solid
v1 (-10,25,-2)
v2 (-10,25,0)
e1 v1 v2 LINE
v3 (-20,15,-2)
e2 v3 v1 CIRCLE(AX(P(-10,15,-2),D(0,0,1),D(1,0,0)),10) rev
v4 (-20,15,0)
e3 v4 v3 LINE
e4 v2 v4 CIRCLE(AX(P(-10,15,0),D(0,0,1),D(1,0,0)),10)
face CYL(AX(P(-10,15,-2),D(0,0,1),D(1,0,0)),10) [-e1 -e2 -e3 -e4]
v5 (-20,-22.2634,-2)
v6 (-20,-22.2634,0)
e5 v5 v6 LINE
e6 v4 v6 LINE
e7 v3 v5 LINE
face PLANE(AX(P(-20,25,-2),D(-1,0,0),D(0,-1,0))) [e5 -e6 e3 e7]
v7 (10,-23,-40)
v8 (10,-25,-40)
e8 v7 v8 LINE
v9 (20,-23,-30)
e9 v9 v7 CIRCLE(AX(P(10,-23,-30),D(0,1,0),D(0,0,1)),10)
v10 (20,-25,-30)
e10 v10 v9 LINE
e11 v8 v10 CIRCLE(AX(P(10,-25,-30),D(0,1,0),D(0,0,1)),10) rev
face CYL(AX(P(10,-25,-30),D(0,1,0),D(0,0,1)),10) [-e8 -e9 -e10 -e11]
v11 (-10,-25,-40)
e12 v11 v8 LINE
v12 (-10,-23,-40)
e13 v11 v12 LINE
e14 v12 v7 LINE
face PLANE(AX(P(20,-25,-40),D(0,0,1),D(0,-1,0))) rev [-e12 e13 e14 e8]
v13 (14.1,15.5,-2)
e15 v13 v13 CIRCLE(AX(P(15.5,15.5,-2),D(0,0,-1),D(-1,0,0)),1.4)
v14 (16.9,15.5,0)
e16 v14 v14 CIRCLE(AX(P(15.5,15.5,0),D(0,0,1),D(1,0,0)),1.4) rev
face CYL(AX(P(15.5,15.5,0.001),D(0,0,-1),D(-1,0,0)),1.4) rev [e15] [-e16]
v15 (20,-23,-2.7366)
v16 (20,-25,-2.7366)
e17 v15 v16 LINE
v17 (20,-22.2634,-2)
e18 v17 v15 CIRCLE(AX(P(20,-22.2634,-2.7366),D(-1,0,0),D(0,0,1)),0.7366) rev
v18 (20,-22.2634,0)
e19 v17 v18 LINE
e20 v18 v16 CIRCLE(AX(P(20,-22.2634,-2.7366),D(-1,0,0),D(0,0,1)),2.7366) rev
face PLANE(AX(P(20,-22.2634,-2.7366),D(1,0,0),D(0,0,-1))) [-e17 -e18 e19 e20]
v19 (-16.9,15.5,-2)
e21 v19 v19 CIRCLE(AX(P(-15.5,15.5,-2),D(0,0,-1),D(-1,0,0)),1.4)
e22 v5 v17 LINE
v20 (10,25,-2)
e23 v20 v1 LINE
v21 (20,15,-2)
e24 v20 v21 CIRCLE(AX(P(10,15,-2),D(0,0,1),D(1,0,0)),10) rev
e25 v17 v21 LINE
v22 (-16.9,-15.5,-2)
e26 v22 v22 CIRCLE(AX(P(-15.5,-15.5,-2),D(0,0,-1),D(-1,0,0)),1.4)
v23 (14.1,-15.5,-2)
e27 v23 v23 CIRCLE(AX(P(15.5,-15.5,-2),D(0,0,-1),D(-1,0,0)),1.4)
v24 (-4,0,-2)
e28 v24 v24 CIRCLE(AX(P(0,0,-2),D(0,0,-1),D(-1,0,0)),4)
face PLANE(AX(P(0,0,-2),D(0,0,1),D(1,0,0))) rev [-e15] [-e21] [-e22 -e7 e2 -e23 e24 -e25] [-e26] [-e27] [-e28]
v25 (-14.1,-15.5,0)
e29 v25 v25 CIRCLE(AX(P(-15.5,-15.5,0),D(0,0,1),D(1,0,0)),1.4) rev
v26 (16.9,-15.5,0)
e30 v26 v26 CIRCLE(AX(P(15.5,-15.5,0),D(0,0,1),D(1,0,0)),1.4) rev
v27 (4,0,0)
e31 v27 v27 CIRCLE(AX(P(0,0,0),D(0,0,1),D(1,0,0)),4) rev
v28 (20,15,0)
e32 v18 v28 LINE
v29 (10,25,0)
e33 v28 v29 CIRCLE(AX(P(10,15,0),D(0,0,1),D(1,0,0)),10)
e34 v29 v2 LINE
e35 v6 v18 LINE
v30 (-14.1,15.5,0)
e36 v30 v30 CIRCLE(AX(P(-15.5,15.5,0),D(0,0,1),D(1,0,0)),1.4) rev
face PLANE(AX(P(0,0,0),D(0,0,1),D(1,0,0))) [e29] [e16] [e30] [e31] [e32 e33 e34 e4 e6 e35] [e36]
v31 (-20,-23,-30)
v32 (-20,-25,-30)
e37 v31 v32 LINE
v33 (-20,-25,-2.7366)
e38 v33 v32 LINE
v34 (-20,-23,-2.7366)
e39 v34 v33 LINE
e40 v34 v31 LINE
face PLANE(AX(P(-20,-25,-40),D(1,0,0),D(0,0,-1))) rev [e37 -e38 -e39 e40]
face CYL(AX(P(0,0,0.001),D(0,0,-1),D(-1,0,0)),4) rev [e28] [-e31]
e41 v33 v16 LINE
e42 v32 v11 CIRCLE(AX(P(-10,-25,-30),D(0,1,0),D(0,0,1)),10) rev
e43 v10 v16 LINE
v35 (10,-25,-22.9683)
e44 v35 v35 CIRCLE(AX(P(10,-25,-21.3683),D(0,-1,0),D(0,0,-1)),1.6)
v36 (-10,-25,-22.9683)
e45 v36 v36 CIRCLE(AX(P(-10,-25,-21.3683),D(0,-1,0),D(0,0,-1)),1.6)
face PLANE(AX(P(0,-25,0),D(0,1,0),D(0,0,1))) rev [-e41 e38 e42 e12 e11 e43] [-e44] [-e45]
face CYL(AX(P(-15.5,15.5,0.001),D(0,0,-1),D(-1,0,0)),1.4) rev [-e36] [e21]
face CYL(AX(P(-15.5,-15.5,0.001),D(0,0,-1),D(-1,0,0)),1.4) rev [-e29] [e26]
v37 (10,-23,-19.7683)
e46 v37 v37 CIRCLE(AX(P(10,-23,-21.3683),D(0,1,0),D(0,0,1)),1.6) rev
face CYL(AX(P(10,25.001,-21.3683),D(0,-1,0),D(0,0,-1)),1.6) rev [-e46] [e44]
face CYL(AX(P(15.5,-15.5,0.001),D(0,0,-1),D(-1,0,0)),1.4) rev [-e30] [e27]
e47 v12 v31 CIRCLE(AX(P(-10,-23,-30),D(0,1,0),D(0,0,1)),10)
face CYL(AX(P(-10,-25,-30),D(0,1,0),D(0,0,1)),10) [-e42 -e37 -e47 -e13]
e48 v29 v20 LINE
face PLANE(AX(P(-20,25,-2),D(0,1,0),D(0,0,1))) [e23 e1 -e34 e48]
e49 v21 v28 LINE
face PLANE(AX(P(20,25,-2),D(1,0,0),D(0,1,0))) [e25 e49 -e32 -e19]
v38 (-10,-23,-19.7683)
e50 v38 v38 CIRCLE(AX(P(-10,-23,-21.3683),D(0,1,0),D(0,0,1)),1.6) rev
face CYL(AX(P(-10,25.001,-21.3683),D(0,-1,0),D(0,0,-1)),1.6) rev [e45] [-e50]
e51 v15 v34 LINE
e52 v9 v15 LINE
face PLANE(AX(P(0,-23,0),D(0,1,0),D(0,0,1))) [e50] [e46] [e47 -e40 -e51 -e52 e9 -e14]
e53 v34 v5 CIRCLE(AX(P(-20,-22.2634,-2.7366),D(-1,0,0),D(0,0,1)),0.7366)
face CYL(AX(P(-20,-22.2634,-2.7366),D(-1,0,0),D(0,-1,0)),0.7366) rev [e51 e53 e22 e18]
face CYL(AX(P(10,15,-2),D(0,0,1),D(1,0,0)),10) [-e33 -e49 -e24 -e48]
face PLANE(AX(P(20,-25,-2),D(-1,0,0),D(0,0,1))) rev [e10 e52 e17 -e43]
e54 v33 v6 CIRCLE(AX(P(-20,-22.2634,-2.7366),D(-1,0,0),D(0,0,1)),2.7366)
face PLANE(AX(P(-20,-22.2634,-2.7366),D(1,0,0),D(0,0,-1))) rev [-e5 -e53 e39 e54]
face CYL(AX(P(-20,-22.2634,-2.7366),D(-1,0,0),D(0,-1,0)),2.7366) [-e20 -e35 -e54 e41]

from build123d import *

# Parameters (mm, degrees)
SKETCH1_W                    = 40
SKETCH1_H                    = 50
BASE_FLANGE1_DEPTH           = 2
EDGE_FLANGE1_STRIP_W         = 9.4732
EDGE_FLANGE1_STRIP_H         = 2
EDGE_FLANGE1_STRIP_CUT_DEPTH = 40
EDGE_FLANGE1_DEPTH           = 40
CUT_EXTRUDE1_REACH           = 51.689
SKETCH9_R                    = 1.4
SKETCH9_R_2                  = 4
CUT_EXTRUDE2_REACH           = 69.082
SKETCH11_R                   = 1.6
FILLET1_R                    = 10


# Sheet-metal steps are written as plain solids
with BuildPart() as part:
    # Sketch1 → Base-Flange1 (new body)
    with BuildSketch(Plane.XY):
        Rectangle(SKETCH1_W, SKETCH1_H)
    extrude(amount=-BASE_FLANGE1_DEPTH)

    # Edge-Flange1 strip (across the edge) → Edge-Flange1 strip cut (cut)
    with BuildSketch(Plane(origin=(20, -25, -2), x_dir=(0, 1, 0), z_dir=(-1, 0, 0))):
        with Locations((-2, -1)):
            Rectangle(EDGE_FLANGE1_STRIP_W, EDGE_FLANGE1_STRIP_H)
    extrude(amount=EDGE_FLANGE1_STRIP_CUT_DEPTH, mode=Mode.SUBTRACT)

    # Edge-Flange1 section (across the edge) → Edge-Flange1 (add)
    with BuildSketch(Plane(origin=(20, -25, -2), x_dir=(0, 1, 0), z_dir=(-1, 0, 0))):
        with BuildLine():
            Line((0, 0.7366), (0, 38))
            Line((0, 38), (2, 38))
            Line((2, 38), (2, 0.7366))
            ThreePointArc((2, 0.7366), (2.215745145, 0.215745145), (2.7366, 0))
            Line((2.7366, 0), (2.7366, -2))
            ThreePointArc((2.7366, -2), (0.801531583, -1.198468417), (0, 0.7366))
        make_face()
    extrude(amount=EDGE_FLANGE1_DEPTH)

    # Sketch9 → Cut-Extrude1 (cut, up to next)
    with BuildSketch(Plane(origin=(0, 0, -2), x_dir=(-1, 0, 0), z_dir=(0, 0, -1)), mode=Mode.PRIVATE) as cut_extrude1_sk1:
        with Locations((-15.5, 15.5)):
            Circle(SKETCH9_R)
    cut_extrude1_tool1 = extrude(cut_extrude1_sk1.sketch, amount=-CUT_EXTRUDE1_REACH, mode=Mode.PRIVATE) & part.part
    # Sketch9 → Cut-Extrude1 (cut, up to next)
    with BuildSketch(Plane(origin=(0, 0, -2), x_dir=(-1, 0, 0), z_dir=(0, 0, -1)), mode=Mode.PRIVATE) as cut_extrude1_sk2:
        with Locations((15.5, 15.5)):
            Circle(SKETCH9_R)
    cut_extrude1_tool2 = extrude(cut_extrude1_sk2.sketch, amount=-CUT_EXTRUDE1_REACH, mode=Mode.PRIVATE) & part.part
    # Sketch9 → Cut-Extrude1 (cut, up to next)
    with BuildSketch(Plane(origin=(0, 0, -2), x_dir=(-1, 0, 0), z_dir=(0, 0, -1)), mode=Mode.PRIVATE) as cut_extrude1_sk3:
        with Locations((15.5, -15.5)):
            Circle(SKETCH9_R)
    cut_extrude1_tool3 = extrude(cut_extrude1_sk3.sketch, amount=-CUT_EXTRUDE1_REACH, mode=Mode.PRIVATE) & part.part
    # Sketch9 → Cut-Extrude1 (cut, up to next)
    with BuildSketch(Plane(origin=(0, 0, -2), x_dir=(-1, 0, 0), z_dir=(0, 0, -1)), mode=Mode.PRIVATE) as cut_extrude1_sk4:
        with Locations((-15.5, -15.5)):
            Circle(SKETCH9_R)
    cut_extrude1_tool4 = extrude(cut_extrude1_sk4.sketch, amount=-CUT_EXTRUDE1_REACH, mode=Mode.PRIVATE) & part.part
    # Sketch9 → Cut-Extrude1 (cut, up to next)
    with BuildSketch(Plane(origin=(0, 0, -2), x_dir=(-1, 0, 0), z_dir=(0, 0, -1)), mode=Mode.PRIVATE) as cut_extrude1_sk5:
        Circle(SKETCH9_R_2)
    cut_extrude1_tool5 = extrude(cut_extrude1_sk5.sketch, amount=-CUT_EXTRUDE1_REACH, mode=Mode.PRIVATE) & part.part
    add(cut_extrude1_tool1.solids().sort_by_distance((15.5, 15.5, -2))[0], mode=Mode.SUBTRACT)
    add(cut_extrude1_tool2.solids().sort_by_distance((-15.5, 15.5, -2))[0], mode=Mode.SUBTRACT)
    add(cut_extrude1_tool3.solids().sort_by_distance((-15.5, -15.5, -2))[0], mode=Mode.SUBTRACT)
    add(cut_extrude1_tool4.solids().sort_by_distance((15.5, -15.5, -2))[0], mode=Mode.SUBTRACT)
    add(cut_extrude1_tool5.solids().sort_by_distance((0, 0, -2))[0], mode=Mode.SUBTRACT)

    # Sketch11 → Cut-Extrude2 (cut, up to next)
    with BuildSketch(Plane.XZ.offset(25), mode=Mode.PRIVATE) as cut_extrude2_sk1:
        with Locations(Location((-10, -21.3683, 0), (0, 0, 270))):
            Circle(SKETCH11_R)
    cut_extrude2_tool1 = extrude(cut_extrude2_sk1.sketch, amount=-CUT_EXTRUDE2_REACH, mode=Mode.PRIVATE) & part.part
    # Sketch11 → Cut-Extrude2 (cut, up to next)
    with BuildSketch(Plane.XZ.offset(25), mode=Mode.PRIVATE) as cut_extrude2_sk2:
        with Locations(Location((10, -21.3683, 0), (0, 0, 270))):
            Circle(SKETCH11_R)
    cut_extrude2_tool2 = extrude(cut_extrude2_sk2.sketch, amount=-CUT_EXTRUDE2_REACH, mode=Mode.PRIVATE) & part.part
    add(cut_extrude2_tool1.solids().sort_by_distance((-10, -25, -21.3683))[0], mode=Mode.SUBTRACT)
    add(cut_extrude2_tool2.solids().sort_by_distance((10, -25, -21.3683))[0], mode=Mode.SUBTRACT)

    # Fillet1
    fillet1_edges = [part.edges().sort_by_distance(p)[0] for p in [
        (20, -24, -40),
        (-20, -24, -40),
        (-20, 25, -1),
        (20, 25, -1),
    ]]
    fillet(fillet1_edges, radius=FILLET1_R)


solid = part.part
